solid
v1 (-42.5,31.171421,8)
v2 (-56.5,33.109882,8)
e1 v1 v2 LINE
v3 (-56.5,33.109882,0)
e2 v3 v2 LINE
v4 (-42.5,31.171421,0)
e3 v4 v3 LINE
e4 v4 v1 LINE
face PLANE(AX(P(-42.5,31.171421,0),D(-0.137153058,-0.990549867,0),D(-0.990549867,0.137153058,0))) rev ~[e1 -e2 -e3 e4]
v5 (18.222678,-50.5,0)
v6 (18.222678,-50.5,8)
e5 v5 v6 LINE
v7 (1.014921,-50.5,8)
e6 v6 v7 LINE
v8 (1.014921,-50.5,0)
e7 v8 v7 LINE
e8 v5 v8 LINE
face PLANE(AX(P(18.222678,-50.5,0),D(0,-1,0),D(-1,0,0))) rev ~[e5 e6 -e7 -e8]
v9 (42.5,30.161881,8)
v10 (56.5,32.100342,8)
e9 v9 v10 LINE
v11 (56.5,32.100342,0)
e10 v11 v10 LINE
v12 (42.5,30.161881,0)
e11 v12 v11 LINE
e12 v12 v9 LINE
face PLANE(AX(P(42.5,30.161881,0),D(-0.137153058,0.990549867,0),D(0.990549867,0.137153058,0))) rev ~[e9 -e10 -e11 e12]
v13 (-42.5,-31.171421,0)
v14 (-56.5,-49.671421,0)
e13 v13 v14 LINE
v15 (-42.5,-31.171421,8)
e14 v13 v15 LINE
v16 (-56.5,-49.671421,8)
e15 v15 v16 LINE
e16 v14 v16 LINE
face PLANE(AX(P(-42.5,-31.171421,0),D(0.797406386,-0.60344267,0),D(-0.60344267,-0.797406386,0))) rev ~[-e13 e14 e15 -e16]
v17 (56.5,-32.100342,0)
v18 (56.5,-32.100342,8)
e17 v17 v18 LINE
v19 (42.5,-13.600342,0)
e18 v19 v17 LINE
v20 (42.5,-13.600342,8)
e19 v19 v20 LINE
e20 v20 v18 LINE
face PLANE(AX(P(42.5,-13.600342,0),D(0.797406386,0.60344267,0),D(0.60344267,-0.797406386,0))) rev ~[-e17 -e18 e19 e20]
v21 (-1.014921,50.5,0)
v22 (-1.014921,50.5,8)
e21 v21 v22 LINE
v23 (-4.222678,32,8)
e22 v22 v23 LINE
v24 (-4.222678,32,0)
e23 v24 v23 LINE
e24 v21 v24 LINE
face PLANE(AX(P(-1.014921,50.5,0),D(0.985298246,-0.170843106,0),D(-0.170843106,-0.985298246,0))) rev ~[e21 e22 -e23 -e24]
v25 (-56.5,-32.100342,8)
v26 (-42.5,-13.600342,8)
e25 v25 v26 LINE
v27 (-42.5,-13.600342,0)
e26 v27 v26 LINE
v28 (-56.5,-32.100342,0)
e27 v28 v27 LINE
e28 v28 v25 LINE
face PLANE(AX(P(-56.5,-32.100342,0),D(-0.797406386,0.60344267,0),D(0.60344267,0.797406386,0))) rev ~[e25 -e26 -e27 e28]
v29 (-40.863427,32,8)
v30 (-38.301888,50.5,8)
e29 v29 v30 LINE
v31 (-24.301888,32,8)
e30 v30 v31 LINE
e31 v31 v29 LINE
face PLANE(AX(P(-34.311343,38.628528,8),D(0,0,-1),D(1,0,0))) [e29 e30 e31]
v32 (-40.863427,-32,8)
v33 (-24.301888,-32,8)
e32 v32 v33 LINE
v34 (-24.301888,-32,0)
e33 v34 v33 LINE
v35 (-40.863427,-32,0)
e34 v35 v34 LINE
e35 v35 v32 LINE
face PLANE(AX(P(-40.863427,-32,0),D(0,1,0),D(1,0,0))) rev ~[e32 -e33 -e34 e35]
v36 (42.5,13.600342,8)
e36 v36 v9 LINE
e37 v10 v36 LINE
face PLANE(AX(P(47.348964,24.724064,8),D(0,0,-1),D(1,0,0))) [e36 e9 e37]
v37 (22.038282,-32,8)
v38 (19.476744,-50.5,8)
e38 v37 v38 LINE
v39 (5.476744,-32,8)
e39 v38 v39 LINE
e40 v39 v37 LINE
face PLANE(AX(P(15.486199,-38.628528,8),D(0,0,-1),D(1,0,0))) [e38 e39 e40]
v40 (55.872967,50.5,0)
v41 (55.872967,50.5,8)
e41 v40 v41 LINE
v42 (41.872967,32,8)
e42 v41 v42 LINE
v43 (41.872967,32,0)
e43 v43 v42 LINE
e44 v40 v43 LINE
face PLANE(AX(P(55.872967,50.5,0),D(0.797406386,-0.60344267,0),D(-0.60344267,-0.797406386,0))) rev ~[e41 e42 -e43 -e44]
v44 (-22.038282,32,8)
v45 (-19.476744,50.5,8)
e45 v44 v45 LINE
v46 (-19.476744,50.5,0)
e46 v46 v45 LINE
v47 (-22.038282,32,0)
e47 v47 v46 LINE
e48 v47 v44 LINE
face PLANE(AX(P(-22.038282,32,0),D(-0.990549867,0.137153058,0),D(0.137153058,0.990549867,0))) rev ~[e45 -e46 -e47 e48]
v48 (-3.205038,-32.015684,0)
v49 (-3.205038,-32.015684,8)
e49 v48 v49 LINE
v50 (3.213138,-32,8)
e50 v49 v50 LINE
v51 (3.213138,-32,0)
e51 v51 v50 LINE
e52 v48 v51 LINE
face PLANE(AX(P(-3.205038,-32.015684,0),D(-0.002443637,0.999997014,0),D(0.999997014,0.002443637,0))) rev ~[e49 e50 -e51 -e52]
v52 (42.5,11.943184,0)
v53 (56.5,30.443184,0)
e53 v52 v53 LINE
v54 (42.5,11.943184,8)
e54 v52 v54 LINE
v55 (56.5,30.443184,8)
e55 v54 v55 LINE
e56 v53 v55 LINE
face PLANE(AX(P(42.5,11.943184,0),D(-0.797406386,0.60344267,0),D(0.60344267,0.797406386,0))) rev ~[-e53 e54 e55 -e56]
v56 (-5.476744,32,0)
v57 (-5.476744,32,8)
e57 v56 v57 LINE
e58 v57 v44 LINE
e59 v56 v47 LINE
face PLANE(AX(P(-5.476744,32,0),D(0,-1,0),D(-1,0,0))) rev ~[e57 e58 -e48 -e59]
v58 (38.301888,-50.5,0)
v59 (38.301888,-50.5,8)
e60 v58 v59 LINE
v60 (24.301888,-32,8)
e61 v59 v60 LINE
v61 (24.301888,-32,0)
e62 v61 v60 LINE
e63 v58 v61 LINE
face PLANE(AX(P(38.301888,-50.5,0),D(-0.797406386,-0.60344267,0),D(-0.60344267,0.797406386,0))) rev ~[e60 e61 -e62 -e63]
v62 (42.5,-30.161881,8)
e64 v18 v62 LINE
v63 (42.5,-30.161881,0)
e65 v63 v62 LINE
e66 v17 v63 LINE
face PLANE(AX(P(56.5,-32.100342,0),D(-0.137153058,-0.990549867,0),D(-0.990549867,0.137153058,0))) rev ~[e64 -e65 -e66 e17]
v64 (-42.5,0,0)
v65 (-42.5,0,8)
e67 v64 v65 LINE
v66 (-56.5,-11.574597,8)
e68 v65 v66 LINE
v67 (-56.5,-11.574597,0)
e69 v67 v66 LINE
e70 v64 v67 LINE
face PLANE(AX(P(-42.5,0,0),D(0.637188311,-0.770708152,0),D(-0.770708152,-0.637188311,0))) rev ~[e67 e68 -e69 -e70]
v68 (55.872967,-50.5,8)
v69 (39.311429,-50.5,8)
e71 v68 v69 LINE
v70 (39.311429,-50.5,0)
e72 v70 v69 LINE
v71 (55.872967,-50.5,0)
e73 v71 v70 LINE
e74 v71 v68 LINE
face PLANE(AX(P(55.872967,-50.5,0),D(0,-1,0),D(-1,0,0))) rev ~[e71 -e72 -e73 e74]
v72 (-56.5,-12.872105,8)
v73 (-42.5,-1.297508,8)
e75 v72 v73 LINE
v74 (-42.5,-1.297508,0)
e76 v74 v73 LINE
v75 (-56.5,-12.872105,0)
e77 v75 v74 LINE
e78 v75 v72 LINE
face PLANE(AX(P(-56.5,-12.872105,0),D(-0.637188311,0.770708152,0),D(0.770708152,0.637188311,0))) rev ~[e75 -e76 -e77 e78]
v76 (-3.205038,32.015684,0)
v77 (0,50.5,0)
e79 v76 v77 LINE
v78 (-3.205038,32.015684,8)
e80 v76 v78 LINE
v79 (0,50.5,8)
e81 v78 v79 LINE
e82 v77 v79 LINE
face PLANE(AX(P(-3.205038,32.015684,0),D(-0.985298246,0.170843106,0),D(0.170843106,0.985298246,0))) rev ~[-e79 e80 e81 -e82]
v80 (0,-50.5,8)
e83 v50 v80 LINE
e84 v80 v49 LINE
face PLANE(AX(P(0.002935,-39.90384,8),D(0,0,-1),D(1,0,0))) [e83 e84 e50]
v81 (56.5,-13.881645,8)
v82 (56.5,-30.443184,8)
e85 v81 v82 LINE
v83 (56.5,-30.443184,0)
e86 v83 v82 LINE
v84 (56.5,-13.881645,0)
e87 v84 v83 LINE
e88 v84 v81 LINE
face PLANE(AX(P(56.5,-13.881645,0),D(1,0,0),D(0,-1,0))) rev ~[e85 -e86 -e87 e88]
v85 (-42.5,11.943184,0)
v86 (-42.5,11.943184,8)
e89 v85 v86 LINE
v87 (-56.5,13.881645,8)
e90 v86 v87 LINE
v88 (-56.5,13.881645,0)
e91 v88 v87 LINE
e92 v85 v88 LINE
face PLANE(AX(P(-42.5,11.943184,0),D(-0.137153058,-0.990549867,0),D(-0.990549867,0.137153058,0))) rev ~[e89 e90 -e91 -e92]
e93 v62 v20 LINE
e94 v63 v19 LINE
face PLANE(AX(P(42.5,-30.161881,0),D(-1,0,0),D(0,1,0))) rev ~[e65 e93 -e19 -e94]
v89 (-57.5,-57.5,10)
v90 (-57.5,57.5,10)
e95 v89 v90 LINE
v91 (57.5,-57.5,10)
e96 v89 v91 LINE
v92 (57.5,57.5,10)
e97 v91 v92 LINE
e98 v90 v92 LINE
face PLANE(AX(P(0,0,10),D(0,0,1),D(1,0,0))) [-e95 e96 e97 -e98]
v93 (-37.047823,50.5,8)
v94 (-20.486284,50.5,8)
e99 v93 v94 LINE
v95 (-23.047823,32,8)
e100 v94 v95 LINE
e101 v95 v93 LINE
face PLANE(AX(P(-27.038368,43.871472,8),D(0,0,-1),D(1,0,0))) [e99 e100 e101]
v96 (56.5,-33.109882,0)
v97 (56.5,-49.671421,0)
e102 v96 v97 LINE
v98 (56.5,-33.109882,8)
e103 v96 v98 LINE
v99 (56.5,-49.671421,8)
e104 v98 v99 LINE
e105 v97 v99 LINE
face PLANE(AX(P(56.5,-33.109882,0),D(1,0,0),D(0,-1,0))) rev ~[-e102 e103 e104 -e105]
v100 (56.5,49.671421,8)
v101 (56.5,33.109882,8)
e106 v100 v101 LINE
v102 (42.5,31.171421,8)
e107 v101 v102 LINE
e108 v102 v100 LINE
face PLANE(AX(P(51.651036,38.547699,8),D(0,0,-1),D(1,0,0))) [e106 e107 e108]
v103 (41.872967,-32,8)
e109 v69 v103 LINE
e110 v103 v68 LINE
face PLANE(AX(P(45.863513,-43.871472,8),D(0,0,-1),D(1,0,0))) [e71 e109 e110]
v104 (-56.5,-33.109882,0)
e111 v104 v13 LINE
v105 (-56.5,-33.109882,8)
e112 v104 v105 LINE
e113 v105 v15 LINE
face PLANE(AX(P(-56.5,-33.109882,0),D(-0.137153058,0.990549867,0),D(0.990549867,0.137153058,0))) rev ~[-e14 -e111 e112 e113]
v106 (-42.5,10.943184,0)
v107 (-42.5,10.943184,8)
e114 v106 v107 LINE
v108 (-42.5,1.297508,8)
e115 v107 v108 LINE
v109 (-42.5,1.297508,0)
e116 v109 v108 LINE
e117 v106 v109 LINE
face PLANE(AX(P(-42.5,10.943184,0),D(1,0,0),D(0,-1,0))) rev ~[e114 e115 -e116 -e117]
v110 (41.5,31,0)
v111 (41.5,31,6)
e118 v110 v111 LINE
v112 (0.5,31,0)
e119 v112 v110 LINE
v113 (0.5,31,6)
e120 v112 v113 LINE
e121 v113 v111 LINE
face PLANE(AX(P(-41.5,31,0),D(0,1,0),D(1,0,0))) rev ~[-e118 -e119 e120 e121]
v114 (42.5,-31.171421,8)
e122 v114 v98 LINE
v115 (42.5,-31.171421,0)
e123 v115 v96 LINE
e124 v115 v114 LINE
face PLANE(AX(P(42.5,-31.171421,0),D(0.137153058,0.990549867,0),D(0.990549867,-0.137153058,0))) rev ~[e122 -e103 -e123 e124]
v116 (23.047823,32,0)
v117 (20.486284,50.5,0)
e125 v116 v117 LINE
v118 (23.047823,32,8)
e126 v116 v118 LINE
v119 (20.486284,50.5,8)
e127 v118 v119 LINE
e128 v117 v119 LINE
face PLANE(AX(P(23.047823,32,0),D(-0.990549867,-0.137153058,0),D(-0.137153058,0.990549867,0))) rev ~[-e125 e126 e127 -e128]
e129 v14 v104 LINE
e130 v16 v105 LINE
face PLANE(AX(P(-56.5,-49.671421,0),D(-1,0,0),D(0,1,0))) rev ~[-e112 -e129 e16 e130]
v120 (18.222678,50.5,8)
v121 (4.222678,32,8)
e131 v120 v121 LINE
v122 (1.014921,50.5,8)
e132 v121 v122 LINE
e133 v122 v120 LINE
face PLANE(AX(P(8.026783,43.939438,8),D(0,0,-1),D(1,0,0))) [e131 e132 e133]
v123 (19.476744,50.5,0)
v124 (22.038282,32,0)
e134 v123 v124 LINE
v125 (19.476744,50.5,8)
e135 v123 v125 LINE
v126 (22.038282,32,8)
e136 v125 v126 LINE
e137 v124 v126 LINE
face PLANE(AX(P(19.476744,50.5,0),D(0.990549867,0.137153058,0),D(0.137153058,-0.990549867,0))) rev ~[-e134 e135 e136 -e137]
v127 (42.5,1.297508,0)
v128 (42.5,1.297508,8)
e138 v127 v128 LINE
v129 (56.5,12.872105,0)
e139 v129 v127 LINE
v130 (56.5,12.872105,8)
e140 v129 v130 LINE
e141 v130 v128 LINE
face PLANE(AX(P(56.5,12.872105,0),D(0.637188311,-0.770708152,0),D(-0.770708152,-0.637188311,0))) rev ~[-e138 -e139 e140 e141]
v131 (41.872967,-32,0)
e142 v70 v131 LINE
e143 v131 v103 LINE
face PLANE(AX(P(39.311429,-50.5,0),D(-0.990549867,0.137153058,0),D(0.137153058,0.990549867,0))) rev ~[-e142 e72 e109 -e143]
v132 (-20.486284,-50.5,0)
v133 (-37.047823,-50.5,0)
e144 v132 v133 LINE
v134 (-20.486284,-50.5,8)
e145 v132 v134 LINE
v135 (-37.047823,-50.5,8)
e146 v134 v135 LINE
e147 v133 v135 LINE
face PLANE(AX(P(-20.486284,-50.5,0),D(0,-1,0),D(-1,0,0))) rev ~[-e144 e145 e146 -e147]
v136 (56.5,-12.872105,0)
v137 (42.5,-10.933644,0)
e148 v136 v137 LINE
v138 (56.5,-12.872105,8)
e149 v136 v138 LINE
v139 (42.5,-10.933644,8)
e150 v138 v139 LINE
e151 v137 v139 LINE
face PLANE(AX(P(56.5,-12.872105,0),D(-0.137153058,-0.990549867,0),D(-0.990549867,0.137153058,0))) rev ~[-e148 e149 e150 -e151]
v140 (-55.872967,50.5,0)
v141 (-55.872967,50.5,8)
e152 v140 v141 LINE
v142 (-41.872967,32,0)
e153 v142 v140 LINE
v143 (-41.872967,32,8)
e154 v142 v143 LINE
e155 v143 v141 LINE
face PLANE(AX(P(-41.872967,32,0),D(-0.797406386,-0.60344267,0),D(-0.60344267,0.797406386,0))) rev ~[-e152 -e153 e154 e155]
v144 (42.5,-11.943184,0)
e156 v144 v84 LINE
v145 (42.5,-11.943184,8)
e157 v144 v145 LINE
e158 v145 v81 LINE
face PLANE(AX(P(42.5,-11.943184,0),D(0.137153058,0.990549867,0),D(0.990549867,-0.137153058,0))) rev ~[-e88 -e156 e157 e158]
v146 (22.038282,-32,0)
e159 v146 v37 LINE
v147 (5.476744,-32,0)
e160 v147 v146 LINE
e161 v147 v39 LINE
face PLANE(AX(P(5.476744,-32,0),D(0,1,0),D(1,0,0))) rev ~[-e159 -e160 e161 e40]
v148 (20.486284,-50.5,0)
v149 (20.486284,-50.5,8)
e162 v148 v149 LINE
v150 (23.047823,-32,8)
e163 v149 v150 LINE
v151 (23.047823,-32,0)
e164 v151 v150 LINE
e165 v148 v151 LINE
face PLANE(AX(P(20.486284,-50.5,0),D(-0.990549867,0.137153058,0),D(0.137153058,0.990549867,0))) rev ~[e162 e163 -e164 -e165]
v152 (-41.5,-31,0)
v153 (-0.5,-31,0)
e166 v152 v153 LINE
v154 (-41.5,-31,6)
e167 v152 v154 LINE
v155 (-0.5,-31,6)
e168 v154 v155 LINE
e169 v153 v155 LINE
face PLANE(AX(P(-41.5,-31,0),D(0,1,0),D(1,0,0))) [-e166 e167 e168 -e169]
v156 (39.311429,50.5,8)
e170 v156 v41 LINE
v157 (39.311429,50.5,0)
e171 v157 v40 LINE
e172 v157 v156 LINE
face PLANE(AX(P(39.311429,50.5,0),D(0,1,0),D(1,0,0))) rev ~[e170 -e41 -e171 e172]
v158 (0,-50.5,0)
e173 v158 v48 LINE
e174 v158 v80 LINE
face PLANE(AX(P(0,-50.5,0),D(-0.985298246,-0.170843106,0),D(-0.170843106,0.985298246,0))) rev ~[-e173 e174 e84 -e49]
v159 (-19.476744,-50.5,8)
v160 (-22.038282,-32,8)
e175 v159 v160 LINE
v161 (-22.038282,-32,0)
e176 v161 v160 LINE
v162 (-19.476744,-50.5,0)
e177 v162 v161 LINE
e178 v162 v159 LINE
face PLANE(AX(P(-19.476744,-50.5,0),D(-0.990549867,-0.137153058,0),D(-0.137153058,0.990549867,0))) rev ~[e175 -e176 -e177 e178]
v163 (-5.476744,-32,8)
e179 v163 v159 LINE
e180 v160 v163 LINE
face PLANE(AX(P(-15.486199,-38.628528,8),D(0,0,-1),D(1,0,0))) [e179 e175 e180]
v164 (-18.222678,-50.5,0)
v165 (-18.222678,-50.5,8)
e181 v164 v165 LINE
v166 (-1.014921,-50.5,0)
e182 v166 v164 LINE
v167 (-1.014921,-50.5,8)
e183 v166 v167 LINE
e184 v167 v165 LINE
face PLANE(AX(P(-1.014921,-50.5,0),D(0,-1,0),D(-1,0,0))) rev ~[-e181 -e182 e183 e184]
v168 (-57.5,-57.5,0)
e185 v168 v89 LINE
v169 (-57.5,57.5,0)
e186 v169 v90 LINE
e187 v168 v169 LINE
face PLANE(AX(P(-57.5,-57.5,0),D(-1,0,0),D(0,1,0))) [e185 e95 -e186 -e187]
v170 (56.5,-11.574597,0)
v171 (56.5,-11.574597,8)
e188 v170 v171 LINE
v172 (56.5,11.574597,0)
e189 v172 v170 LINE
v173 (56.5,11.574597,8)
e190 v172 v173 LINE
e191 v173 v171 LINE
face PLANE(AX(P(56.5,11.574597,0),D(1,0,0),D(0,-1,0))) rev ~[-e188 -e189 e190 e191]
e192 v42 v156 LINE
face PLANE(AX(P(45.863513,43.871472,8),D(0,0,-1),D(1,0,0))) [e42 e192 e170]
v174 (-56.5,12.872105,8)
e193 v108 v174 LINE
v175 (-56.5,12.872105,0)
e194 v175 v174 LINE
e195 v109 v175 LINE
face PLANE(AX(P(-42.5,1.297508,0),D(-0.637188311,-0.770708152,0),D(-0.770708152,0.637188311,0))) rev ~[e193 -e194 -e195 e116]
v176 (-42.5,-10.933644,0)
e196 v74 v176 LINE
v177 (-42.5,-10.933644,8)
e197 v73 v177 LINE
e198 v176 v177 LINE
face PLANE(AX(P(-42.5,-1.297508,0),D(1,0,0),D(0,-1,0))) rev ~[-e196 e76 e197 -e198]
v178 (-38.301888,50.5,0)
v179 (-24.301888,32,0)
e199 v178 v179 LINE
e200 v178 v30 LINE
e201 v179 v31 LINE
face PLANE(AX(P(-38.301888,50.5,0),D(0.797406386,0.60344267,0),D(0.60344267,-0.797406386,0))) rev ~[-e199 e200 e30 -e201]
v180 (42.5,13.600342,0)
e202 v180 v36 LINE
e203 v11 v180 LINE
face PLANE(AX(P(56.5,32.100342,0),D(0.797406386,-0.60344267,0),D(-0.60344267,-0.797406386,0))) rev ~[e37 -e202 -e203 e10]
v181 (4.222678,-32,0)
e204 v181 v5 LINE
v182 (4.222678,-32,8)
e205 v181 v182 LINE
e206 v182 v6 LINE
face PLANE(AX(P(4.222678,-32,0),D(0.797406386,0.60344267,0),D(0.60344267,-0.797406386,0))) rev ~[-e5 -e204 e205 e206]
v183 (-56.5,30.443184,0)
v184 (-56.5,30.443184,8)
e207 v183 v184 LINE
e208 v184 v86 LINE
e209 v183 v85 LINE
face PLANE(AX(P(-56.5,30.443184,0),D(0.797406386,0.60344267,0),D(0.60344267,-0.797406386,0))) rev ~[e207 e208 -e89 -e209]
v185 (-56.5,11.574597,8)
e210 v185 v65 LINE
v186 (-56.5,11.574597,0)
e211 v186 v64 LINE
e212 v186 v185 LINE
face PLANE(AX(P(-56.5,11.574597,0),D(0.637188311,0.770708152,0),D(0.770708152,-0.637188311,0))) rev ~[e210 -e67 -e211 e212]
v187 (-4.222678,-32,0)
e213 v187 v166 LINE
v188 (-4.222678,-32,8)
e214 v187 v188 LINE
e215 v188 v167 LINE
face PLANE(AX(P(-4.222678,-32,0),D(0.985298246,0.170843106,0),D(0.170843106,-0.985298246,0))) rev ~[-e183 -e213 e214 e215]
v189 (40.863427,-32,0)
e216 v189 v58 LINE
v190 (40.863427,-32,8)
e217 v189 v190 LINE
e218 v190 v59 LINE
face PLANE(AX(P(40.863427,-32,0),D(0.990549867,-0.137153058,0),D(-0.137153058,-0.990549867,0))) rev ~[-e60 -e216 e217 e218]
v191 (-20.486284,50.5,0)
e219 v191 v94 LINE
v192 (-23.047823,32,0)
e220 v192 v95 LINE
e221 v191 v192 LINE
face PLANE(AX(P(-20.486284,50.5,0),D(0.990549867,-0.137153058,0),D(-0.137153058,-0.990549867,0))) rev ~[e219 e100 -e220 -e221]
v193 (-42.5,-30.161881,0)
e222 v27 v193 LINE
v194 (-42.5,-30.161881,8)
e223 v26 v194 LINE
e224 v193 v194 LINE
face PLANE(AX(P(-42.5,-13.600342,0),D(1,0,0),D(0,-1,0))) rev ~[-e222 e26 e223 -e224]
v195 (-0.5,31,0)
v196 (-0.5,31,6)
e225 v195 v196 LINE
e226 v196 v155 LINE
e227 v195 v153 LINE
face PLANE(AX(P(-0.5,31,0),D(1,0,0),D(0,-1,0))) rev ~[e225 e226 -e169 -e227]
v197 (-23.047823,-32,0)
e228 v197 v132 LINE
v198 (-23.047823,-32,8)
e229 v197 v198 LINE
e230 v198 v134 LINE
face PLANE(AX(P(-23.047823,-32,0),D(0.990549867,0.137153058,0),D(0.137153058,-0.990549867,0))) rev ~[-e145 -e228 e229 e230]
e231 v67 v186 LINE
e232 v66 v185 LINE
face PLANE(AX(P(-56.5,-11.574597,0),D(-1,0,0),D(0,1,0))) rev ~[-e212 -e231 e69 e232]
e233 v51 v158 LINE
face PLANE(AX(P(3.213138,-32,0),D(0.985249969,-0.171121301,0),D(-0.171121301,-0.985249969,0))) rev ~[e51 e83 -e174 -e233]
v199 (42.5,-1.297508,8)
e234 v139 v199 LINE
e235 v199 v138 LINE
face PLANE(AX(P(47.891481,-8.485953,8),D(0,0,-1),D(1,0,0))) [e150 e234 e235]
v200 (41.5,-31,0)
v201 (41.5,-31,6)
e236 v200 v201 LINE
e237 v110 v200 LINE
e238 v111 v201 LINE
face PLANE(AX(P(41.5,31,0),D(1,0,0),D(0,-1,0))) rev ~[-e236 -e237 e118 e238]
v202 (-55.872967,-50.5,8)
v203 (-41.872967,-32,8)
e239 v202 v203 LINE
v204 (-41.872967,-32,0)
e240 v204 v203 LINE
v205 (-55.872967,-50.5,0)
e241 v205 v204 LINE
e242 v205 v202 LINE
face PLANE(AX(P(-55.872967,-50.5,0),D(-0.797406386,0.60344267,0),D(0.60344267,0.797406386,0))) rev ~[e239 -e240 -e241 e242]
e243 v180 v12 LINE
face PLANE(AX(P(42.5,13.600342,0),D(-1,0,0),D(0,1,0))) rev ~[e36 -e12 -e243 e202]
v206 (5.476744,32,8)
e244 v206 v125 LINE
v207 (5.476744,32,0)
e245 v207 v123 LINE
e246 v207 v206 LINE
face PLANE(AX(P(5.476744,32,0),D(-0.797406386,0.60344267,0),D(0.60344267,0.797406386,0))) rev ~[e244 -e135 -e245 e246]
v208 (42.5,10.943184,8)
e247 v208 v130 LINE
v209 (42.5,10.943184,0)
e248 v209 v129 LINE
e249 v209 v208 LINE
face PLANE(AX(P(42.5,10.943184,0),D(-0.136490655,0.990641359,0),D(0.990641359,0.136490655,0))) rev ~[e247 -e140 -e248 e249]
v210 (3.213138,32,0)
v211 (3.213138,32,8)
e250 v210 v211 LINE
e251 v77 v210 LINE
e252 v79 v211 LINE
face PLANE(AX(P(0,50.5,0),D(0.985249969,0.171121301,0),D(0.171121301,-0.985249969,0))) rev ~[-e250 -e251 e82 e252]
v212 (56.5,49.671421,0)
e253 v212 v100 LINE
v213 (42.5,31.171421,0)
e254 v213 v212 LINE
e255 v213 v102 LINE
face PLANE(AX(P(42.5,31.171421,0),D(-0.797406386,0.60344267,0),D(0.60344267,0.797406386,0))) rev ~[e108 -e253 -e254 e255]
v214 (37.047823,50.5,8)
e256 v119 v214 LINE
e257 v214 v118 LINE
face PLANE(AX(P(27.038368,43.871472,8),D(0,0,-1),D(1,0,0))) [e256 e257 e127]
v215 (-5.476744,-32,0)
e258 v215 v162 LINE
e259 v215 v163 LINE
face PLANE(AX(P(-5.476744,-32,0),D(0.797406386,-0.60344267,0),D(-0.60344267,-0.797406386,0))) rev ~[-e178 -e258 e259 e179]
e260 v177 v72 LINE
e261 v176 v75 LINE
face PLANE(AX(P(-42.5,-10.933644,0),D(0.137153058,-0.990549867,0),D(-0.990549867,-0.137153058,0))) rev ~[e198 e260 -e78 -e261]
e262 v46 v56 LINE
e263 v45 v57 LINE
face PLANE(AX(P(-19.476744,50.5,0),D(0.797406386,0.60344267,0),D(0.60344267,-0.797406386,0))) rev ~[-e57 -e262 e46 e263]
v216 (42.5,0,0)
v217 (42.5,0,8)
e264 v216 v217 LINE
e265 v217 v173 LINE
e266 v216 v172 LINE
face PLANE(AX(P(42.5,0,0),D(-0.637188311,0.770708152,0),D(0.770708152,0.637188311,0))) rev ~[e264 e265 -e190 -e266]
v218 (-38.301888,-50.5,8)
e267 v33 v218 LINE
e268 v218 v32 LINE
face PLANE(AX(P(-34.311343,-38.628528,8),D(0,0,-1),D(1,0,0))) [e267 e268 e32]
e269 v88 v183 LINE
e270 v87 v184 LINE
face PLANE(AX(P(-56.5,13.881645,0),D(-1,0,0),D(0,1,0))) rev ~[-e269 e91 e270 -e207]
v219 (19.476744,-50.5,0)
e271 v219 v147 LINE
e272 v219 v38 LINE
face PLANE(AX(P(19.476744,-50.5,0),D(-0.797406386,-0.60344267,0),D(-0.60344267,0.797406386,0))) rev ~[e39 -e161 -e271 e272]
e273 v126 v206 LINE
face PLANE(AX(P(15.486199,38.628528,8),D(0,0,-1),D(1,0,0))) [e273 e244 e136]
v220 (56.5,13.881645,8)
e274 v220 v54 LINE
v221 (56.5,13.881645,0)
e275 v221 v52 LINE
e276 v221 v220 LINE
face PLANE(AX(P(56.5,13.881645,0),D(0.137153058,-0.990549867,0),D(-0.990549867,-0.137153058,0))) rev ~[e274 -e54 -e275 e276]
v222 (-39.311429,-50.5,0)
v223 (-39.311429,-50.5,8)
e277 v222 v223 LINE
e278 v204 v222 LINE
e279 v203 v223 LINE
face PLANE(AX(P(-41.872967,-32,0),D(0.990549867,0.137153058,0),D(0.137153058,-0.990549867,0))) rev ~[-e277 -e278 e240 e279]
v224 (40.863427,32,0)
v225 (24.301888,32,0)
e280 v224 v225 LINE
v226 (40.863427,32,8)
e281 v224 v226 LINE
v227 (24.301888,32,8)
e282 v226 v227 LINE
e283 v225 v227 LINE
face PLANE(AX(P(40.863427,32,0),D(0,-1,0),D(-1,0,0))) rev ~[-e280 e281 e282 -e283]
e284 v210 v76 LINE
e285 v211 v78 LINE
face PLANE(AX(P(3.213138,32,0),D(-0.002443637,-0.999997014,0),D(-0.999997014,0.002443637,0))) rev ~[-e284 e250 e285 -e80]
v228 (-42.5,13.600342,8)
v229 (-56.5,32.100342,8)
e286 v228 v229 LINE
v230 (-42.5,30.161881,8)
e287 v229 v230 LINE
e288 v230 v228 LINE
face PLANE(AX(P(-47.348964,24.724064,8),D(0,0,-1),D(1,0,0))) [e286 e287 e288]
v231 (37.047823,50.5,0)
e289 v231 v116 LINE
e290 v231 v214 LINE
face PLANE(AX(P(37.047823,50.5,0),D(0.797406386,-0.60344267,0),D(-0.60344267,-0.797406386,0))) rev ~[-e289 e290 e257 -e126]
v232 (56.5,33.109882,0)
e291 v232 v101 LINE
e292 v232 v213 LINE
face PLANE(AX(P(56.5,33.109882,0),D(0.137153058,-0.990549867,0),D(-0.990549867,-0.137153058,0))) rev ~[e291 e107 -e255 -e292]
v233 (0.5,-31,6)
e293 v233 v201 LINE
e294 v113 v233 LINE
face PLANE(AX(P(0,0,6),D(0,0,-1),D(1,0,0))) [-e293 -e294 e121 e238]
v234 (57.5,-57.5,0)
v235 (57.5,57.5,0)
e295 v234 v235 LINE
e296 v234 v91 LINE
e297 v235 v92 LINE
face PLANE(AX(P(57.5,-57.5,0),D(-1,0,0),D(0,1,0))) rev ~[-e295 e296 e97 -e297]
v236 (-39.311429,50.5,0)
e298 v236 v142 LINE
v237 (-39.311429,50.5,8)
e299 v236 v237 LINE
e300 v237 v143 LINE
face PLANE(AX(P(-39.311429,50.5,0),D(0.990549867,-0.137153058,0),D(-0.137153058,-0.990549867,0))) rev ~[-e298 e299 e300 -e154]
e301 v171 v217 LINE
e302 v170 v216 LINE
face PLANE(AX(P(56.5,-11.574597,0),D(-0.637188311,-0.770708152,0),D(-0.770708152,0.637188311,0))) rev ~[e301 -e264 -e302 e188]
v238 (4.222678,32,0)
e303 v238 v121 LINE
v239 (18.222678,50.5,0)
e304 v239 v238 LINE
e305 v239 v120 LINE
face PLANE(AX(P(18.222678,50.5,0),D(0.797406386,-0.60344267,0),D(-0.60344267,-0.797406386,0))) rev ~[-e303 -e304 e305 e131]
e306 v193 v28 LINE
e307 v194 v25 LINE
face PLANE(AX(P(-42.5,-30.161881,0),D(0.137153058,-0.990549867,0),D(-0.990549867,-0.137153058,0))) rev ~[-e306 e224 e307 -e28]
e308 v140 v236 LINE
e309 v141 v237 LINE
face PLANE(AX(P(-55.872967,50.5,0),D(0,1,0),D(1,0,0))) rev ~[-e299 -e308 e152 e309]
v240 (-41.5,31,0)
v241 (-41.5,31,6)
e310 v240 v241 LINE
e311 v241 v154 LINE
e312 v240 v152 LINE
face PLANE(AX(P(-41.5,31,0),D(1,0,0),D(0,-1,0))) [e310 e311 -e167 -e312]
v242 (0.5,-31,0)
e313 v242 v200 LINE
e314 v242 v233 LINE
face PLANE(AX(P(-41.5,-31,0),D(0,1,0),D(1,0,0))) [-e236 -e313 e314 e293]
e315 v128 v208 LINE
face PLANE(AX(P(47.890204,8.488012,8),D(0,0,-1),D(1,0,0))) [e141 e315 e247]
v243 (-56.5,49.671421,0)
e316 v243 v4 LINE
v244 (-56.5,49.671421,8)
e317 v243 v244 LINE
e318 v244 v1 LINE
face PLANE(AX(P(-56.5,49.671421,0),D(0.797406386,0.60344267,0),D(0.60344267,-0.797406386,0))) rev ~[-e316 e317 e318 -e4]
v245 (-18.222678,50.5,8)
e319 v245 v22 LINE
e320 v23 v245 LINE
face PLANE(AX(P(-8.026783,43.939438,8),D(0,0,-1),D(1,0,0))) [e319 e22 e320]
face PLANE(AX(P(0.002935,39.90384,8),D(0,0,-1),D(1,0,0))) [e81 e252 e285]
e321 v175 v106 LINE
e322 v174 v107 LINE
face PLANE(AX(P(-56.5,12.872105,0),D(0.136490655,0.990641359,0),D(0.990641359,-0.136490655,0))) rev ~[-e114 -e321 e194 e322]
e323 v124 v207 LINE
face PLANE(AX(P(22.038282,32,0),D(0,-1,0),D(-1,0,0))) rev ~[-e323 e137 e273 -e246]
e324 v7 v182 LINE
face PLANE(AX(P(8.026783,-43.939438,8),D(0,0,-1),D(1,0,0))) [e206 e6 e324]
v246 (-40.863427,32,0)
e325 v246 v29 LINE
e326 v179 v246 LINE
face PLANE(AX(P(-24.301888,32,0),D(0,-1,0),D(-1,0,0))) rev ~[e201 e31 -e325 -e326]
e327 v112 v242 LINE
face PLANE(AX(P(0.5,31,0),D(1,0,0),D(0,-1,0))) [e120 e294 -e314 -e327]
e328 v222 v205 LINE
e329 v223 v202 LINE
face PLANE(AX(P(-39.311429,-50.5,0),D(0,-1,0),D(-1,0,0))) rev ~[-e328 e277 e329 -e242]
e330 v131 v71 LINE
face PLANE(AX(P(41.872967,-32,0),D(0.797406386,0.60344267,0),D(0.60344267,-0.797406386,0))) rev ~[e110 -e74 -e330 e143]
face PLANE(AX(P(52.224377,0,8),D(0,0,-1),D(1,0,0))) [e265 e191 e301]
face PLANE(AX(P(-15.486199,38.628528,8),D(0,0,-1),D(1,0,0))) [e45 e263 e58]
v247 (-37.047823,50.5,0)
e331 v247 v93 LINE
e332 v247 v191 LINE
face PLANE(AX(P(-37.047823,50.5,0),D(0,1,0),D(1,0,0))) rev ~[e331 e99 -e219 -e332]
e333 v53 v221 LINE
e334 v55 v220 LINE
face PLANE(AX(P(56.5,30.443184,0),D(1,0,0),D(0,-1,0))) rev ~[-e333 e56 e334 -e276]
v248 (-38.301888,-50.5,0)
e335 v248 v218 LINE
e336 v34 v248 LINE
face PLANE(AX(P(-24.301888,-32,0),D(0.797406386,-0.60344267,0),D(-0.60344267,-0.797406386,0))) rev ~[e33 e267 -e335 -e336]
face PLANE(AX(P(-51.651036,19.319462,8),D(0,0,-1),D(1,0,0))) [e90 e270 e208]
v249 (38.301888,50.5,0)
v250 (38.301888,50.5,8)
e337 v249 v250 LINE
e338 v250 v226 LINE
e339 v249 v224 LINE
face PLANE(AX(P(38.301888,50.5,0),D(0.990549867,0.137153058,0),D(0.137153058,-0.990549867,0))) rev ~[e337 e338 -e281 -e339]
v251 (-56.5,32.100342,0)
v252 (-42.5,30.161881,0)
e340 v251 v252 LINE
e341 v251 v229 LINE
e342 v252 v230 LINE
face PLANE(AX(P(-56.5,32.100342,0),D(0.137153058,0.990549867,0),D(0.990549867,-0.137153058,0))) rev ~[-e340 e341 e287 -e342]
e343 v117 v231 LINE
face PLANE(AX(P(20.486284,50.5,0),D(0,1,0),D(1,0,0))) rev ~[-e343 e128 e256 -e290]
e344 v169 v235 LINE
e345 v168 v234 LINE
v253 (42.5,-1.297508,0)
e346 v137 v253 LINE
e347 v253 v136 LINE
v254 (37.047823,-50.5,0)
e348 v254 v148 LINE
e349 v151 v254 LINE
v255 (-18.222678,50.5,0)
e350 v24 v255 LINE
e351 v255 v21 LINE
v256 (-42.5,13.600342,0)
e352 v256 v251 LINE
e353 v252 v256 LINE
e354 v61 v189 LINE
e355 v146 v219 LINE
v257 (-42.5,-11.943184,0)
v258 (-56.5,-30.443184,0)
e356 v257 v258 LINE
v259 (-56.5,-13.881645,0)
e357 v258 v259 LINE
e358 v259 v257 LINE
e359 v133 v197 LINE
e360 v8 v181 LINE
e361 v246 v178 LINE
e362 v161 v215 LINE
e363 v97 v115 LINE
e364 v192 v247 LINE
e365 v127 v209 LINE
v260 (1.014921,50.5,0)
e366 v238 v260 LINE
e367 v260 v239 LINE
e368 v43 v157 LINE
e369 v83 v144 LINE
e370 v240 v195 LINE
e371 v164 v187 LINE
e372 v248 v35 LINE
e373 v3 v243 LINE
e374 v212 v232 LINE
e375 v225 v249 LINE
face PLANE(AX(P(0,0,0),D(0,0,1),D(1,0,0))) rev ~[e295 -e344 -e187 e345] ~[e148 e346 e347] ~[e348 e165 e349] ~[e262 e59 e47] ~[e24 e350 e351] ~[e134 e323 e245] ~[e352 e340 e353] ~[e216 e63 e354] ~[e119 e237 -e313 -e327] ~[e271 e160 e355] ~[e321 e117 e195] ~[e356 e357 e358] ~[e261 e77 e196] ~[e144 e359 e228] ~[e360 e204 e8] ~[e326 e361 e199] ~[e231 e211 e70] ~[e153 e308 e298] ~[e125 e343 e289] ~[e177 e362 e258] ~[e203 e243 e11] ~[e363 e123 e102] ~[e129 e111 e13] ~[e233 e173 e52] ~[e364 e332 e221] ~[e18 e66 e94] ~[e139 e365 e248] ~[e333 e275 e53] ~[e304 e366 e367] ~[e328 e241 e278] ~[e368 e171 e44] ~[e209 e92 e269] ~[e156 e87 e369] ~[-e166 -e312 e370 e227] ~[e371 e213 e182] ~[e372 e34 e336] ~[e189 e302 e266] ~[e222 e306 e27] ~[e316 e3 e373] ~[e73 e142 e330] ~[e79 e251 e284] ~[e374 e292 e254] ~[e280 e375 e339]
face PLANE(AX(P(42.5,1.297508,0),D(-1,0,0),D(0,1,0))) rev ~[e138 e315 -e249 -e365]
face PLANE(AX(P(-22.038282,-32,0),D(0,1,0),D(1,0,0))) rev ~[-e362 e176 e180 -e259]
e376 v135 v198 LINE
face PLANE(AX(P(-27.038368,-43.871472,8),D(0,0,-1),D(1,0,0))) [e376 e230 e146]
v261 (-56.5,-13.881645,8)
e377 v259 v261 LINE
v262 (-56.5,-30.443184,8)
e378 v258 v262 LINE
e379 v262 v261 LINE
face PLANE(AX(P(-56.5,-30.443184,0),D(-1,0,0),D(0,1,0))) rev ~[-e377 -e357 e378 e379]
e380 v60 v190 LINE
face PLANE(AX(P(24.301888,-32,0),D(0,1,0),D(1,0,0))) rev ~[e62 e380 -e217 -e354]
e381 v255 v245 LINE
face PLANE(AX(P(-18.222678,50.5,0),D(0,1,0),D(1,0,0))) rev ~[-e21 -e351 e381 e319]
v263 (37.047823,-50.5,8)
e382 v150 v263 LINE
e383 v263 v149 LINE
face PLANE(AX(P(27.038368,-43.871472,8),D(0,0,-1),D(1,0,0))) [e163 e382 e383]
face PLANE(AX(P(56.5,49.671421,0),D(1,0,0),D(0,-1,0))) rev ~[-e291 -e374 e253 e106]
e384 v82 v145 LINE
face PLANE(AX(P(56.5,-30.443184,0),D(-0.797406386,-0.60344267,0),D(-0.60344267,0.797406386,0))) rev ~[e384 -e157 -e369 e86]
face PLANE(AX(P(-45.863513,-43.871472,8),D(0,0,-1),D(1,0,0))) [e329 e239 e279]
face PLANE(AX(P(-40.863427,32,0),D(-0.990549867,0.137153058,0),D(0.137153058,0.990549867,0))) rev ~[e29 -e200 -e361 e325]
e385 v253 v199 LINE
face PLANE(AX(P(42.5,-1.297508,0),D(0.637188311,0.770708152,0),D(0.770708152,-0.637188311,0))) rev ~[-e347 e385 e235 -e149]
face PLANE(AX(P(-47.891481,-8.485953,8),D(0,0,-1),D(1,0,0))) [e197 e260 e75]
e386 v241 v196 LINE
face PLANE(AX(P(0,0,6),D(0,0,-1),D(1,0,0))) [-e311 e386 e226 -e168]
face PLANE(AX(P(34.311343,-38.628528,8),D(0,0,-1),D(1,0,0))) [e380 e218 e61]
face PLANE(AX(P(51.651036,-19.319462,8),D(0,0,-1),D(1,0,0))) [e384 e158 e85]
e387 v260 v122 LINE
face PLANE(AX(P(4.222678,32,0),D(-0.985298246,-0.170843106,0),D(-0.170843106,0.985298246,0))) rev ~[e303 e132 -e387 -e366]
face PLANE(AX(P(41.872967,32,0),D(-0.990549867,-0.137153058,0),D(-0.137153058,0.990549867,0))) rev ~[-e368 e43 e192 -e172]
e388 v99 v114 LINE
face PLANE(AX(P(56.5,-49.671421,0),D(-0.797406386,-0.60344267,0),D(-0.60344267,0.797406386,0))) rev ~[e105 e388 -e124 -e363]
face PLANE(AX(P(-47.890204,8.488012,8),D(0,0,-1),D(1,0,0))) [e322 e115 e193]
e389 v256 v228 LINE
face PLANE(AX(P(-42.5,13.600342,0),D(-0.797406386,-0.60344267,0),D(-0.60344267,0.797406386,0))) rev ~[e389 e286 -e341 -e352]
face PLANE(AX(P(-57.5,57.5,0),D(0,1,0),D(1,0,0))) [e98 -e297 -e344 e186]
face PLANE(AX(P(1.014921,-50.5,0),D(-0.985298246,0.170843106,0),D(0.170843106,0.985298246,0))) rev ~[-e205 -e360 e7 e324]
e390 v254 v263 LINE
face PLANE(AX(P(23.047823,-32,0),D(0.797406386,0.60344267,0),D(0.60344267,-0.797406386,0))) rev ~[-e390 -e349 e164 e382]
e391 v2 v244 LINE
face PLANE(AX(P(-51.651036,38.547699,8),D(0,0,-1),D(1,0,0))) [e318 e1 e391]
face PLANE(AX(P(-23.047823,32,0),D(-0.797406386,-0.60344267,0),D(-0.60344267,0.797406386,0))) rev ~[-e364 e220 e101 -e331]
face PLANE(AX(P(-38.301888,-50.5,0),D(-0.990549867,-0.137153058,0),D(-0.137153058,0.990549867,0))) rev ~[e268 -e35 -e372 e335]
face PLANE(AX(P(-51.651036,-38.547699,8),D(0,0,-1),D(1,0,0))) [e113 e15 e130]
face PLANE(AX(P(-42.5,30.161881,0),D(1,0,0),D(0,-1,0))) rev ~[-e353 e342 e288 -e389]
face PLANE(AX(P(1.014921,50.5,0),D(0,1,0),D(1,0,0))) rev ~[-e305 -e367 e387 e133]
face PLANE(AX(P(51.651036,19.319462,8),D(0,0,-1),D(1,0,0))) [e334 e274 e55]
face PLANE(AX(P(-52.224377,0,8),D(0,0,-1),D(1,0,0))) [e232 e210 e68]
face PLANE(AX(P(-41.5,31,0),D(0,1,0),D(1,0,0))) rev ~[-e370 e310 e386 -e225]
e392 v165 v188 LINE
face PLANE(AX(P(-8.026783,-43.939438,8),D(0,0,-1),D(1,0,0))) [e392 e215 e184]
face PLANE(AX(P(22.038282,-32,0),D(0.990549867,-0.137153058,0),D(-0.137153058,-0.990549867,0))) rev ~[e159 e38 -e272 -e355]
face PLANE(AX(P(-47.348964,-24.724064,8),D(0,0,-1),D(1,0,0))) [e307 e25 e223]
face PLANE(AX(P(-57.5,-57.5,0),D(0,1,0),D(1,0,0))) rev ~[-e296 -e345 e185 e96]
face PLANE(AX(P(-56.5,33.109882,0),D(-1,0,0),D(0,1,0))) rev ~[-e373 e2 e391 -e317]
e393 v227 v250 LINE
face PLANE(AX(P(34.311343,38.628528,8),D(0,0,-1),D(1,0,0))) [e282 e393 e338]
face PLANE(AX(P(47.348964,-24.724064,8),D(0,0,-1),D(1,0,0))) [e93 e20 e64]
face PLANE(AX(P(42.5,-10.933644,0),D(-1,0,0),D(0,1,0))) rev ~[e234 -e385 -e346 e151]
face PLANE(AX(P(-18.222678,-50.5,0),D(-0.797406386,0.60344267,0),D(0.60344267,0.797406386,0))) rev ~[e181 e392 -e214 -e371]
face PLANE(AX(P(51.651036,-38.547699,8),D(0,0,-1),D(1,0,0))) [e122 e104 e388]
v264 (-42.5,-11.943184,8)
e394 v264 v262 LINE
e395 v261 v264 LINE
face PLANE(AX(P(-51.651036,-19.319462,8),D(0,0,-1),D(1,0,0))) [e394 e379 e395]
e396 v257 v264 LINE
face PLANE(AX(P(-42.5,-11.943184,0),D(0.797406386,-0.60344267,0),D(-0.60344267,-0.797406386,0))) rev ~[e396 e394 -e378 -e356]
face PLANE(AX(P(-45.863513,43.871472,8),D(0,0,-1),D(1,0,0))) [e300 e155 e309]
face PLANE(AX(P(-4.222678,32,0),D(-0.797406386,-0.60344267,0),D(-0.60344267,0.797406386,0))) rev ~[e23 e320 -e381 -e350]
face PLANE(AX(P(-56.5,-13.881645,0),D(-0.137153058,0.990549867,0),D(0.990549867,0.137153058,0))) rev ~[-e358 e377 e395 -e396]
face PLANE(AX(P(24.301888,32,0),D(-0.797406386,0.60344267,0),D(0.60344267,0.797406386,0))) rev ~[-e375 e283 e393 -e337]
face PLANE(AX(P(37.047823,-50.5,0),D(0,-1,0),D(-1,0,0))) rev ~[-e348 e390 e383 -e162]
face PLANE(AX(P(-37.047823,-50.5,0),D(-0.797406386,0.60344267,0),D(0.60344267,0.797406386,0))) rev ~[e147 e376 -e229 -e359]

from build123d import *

# Parameters (mm, degrees)
F0_W     = 115
F0_H     = 115
F1_DEPTH = 10
F2_W     = 83
F2_H     = 62
F3_DEPTH = 6
F4_W     = 1
F4_H     = 62
F5_DEPTH = 6
F7_DEPTH = 8


# Not quite as in the source:
# - a feature of the source that left no trace in its solid (it failed there, or was rolled back) is left out


with BuildPart() as f1:
    # F0 (on Top) → F1 (new body)
    with BuildSketch(Plane.XY):
        Rectangle(F0_W, F0_H)
    extrude(amount=F1_DEPTH)

    # F2 (on face) → F3 (cut)
    with BuildSketch(Plane(origin=(0, 0, 0), x_dir=(1, 0, 0), z_dir=(0, 0, -1))):
        Rectangle(F2_W, F2_H)
    extrude(amount=-F3_DEPTH, mode=Mode.SUBTRACT)

    # F4 (on face) → F5 (join)
    with BuildSketch(Plane(origin=(0, 0, 0), x_dir=(1, 0, 0), z_dir=(0, 0, -1))):
        Rectangle(F4_W, F4_H)
    extrude(amount=-F5_DEPTH)

    # F6 (on face) → F7 (cut)
    with BuildSketch(Plane(origin=(0, 0, 0), x_dir=(1, 0, 0), z_dir=(0, 0, -1))):
        Polygon((-39.3114286867, 50.5), (-55.8729671482, 50.5), (-41.8729671482, 32), align=None)
        Polygon((-56.5, 33.1098824129), (-42.5, 31.1714208744), (-56.5, 49.6714208744), align=None)
        Polygon((-38.3018883964, 50.5), (-40.863426858, 32), (-24.3018883964, 32), align=None)
        Polygon((-20.4862842313, 50.5), (-37.0478226928, 50.5), (-23.0478226928, 32), align=None)
        Polygon((-19.4767439411, 50.5), (-22.0382824026, 32), (-5.4767439411, 32), align=None)
        Polygon((-1.0149211209, 50.5), (-18.2226782375, 50.5), (-4.2226782375, 32), align=None)
        Polygon((0, 50.5), (-3.2050376771, 32.0156837407), (3.2131379472, 32), align=None)
        Polygon((4.2226782375, 32), (18.2226782375, 50.5), (1.0149211209, 50.5), align=None)
        Polygon((22.0382824026, 32), (19.4767439411, 50.5), (5.4767439411, 32), align=None)
        Polygon((20.4862842313, 50.5), (23.0478226928, 32), (37.0478226928, 50.5), align=None)
        Polygon((40.863426858, 32), (38.3018883964, 50.5), (24.3018883964, 32), align=None)
        Polygon((39.3114286867, 50.5), (41.8729671482, 32), (55.8729671482, 50.5), align=None)
        Polygon((56.5, 49.6714208744), (42.5, 31.1714208744), (56.5, 33.1098824129), align=None)
        Polygon((-42.5, 13.6003421226), (-42.5, 30.1618805842), (-56.5, 32.1003421226), align=None)
        Polygon((-42.5, 11.9431838715), (-56.5, 30.4431838715), (-56.5, 13.8816454099), align=None)
        Polygon((-42.5, 1.2975080085), (-42.5, 10.9336435812), (-56.5, 12.8721051197), align=None)
        Polygon((-56.5, -13.8816454099), (-56.5, -30.4431838715), (-42.5, -11.9431838715), align=None)
        Polygon((-42.5, -13.6003421226), (-56.5, -32.1003421226), (-42.5, -30.1618805842), align=None)
        Polygon((-56.5, -49.6714208744), (-42.5, -31.1714208744), (-56.5, -33.1098824129), align=None)
        Polygon((-41.8729671482, -32), (-55.8729671482, -50.5), (-39.3114286867, -50.5), align=None)
        Polygon((56.5, 32.1003421226), (42.5, 30.1618805842), (42.5, 13.6003421226), align=None)
        Polygon((42.5, 11.9431838715), (56.5, 13.8816454099), (56.5, 30.4431838715), align=None)
        Polygon((56.5, -13.8816454099), (42.5, -11.9431838715), (56.5, -30.4431838715), align=None)
        Polygon((42.5, -30.1618805842), (56.5, -32.1003421226), (42.5, -13.6003421226), align=None)
        Polygon((56.5, -33.1098824129), (42.5, -31.1714208744), (56.5, -49.6714208744), align=None)
        Polygon((39.3114286867, -50.5), (55.8729671482, -50.5), (41.8729671482, -32), align=None)
        Polygon((-38.3018883964, -50.5), (-24.3018883964, -32), (-40.863426858, -32), align=None)
        Polygon((-23.0478226928, -32), (-37.0478226928, -50.5), (-20.4862842313, -50.5), align=None)
        Polygon((-5.4767439411, -32), (-22.0382824026, -32), (-19.4767439411, -50.5), align=None)
        Polygon((-4.2226782375, -32), (-18.2226782375, -50.5), (-1.0149211209, -50.5), align=None)
        Polygon((1.0149211209, -50.5), (18.2226782375, -50.5), (4.2226782375, -32), align=None)
        Polygon((5.4767439411, -32), (19.4767439411, -50.5), (22.0382824026, -32), align=None)
        Polygon((37.0478226928, -50.5), (23.0478226928, -32), (20.4862842313, -50.5), align=None)
        Polygon((24.3018883964, -32), (38.3018883964, -50.5), (40.863426858, -32), align=None)
        Polygon((3.2131379472, -32), (-3.2050376771, -32.0156837407), (0, -50.5), align=None)
        Polygon((56.5, 12.8721051197), (42.5, 10.9336435812), (42.5, 1.2975080085), align=None)
        Polygon((-42.5, 0), (-56.5, 11.5745971112), (-56.5, -11.5745971112), align=None)
        Polygon((56.5, -11.5745971112), (56.5, 11.5745971112), (42.5, 0), align=None)
        Polygon((-42.5, -10.9431838715), (-42.5, -1.2975080085), (-56.5, -12.8721051197), align=None)
        Polygon((42.5, -10.9431838715), (56.5, -12.8721051197), (42.5, -1.2975080085), align=None)
    extrude(amount=-F7_DEPTH, mode=Mode.SUBTRACT)


solid = f1.part
